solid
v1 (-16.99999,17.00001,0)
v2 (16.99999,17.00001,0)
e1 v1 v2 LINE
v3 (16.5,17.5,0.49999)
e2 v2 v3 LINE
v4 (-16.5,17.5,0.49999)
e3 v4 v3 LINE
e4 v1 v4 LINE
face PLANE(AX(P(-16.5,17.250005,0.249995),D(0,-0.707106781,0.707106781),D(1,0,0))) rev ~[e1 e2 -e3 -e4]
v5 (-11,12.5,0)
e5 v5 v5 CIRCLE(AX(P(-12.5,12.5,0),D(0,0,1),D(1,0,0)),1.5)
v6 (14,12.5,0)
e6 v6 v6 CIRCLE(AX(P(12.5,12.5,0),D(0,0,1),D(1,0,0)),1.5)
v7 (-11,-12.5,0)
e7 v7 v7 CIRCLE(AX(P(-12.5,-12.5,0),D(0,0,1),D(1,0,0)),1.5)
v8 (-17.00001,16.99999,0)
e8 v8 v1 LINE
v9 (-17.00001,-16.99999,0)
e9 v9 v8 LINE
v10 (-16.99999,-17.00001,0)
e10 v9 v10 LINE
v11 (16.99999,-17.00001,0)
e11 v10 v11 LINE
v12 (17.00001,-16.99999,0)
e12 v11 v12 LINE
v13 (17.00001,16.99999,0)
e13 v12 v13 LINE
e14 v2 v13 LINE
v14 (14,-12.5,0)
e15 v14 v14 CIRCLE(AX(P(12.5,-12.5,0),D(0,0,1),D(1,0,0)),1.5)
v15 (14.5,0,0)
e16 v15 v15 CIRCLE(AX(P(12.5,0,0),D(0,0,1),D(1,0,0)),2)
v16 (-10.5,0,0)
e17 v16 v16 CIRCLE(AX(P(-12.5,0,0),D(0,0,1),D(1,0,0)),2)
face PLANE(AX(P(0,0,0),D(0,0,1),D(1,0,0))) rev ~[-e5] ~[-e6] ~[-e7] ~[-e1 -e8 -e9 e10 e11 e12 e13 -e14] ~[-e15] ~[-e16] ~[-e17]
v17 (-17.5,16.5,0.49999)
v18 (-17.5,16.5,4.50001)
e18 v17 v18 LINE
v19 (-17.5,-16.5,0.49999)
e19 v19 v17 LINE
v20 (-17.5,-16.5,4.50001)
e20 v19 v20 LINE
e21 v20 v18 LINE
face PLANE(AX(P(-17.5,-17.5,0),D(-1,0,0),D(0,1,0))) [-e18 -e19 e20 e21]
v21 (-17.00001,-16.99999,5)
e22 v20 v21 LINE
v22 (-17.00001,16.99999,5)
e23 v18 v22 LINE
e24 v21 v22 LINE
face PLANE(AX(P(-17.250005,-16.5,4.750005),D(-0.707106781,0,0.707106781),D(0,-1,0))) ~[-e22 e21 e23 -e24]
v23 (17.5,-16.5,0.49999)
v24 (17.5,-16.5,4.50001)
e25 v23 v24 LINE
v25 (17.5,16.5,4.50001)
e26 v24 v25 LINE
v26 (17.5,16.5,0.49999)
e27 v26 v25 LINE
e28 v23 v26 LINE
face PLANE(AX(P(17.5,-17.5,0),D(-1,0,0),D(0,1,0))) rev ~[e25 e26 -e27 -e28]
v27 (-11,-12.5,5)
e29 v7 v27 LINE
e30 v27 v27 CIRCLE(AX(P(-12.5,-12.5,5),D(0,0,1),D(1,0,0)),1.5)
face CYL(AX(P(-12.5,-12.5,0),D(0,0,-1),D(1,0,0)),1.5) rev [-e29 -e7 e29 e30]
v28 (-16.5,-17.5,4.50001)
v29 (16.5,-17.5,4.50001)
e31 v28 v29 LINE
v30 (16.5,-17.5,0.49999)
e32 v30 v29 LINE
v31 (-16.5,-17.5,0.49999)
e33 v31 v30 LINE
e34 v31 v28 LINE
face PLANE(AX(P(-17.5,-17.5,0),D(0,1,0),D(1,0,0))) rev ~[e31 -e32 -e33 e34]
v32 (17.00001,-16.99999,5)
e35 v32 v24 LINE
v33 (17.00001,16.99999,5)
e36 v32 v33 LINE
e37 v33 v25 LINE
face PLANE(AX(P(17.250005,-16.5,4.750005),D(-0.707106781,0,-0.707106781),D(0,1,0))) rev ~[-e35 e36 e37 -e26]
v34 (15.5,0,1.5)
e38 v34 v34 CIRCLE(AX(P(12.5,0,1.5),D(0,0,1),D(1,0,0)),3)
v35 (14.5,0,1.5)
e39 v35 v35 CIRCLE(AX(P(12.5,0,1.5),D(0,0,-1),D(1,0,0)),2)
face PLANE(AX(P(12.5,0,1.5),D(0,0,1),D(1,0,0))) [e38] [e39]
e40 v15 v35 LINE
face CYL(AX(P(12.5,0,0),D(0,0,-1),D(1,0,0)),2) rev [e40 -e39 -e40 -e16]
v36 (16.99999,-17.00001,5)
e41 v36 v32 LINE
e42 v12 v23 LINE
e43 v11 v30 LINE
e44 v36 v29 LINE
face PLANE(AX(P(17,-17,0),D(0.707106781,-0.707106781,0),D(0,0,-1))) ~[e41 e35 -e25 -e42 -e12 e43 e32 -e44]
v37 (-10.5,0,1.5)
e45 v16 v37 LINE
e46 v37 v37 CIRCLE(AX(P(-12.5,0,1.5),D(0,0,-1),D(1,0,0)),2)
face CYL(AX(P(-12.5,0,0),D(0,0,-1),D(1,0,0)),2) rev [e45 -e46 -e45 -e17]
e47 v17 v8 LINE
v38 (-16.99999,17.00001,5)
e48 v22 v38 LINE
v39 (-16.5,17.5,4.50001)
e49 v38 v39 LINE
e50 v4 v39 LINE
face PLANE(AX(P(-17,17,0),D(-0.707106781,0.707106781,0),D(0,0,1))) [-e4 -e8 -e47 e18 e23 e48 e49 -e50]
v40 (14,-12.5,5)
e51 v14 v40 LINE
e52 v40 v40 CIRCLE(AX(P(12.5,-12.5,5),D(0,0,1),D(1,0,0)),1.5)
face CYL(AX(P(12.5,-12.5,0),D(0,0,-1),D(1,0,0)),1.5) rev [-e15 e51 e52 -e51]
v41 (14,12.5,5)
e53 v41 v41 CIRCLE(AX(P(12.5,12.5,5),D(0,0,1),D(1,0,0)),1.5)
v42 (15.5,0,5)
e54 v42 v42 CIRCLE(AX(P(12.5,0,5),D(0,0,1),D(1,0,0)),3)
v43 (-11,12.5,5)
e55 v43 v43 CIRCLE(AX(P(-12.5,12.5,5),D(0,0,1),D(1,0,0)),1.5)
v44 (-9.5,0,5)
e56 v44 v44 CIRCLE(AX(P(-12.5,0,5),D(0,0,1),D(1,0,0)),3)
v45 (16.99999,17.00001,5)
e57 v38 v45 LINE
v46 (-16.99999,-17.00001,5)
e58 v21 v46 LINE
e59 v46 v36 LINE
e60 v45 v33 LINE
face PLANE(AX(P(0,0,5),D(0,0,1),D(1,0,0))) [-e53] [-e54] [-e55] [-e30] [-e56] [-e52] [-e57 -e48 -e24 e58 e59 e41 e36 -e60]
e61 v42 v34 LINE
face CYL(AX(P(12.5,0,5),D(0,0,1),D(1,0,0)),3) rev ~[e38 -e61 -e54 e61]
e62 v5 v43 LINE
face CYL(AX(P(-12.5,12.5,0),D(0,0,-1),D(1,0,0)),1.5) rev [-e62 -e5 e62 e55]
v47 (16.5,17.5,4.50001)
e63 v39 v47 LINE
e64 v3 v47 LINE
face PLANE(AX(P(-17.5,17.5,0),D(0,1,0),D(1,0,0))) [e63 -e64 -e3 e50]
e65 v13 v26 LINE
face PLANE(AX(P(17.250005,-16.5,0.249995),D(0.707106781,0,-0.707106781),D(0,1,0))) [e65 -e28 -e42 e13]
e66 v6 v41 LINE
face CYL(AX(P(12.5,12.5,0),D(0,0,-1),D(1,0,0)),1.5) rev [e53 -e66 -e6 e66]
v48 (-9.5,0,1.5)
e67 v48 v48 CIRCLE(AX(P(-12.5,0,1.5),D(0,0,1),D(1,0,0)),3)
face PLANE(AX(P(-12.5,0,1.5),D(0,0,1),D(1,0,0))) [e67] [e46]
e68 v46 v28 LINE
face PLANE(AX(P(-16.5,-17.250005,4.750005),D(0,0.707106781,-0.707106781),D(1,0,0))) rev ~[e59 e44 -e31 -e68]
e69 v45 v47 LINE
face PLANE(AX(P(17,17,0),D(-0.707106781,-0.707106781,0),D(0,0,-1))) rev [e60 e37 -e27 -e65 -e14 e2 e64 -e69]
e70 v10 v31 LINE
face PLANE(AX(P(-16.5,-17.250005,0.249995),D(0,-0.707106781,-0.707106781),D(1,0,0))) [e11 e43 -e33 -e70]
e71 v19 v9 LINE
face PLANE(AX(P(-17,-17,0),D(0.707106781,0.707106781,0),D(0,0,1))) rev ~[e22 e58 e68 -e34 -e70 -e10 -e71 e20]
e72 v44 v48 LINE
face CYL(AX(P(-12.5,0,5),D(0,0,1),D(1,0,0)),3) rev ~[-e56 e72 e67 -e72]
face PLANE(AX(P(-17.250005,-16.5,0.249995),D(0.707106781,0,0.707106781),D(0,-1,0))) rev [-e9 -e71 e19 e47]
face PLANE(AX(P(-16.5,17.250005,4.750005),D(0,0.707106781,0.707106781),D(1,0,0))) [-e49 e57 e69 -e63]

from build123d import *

# Parameters (mm, degrees)
F0_W     = 35
F0_H     = 35
F0_R     = 1.5
F0_R_2   = 2
F1_DEPTH = 5
F2_R     = 3
F3_DEPTH = 3.5
F4_SIZE  = 1
F5_SIZE  = 0.49999


# Not quite as in the source:
# - a fillet or chamfer is up to 0.001 mm smaller than in the source, because OpenCascade refuses the exact size


with BuildPart() as f1:
    # F0 (on Top) → F1 (new body)
    with BuildSketch(Plane.XY):
        Rectangle(F0_W, F0_H)
        with Locations((-12.5, -12.5)):
            Circle(F0_R, mode=Mode.SUBTRACT)
        with Locations((12.5, -12.5)):
            Circle(F0_R, mode=Mode.SUBTRACT)
        with Locations((-12.5, 0)):
            Circle(F0_R_2, mode=Mode.SUBTRACT)
        with Locations((-12.5, 12.5)):
            Circle(F0_R, mode=Mode.SUBTRACT)
        with Locations((12.5, 0)):
            Circle(F0_R_2, mode=Mode.SUBTRACT)
        with Locations((12.5, 12.5)):
            Circle(F0_R, mode=Mode.SUBTRACT)
    extrude(amount=F1_DEPTH)

    # F2 (on face) → F3 (cut)
    with BuildSketch(Plane.XY.offset(5)):
        with Locations((-12.5, 0)):
            Circle(F2_R)
        with Locations((12.5, 0)):
            Circle(F2_R)
    extrude(amount=-F3_DEPTH, mode=Mode.SUBTRACT)

    # F4
    f4_edges = [f1.edges().sort_by_distance(p)[0] for p in [
        (-17.5, -17.5, 2.5),
        (-17.5, 17.5, 2.5),
        (17.5, -17.5, 2.5),
        (17.5, 17.5, 2.5),
    ]]
    chamfer(f4_edges, length=F4_SIZE)

    # F5 (size 0.5 in the source; OpenCascade refuses exactly that, so slightly less here)
    f5_edges = [f1.edges().sort_by_distance(p)[0] for p in [
        (17.5, 0, 5),
        (0, 17.5, 5),
        (-17.5, 0, 5),
        (17.5, 0, 0),
        (0, -17.5, 5),
        (0, -17.5, 0),
        (0, 17.5, 0),
        (-17.5, 0, 0),
    ]]
    chamfer(f5_edges, length=F5_SIZE)


solid = f1.part
